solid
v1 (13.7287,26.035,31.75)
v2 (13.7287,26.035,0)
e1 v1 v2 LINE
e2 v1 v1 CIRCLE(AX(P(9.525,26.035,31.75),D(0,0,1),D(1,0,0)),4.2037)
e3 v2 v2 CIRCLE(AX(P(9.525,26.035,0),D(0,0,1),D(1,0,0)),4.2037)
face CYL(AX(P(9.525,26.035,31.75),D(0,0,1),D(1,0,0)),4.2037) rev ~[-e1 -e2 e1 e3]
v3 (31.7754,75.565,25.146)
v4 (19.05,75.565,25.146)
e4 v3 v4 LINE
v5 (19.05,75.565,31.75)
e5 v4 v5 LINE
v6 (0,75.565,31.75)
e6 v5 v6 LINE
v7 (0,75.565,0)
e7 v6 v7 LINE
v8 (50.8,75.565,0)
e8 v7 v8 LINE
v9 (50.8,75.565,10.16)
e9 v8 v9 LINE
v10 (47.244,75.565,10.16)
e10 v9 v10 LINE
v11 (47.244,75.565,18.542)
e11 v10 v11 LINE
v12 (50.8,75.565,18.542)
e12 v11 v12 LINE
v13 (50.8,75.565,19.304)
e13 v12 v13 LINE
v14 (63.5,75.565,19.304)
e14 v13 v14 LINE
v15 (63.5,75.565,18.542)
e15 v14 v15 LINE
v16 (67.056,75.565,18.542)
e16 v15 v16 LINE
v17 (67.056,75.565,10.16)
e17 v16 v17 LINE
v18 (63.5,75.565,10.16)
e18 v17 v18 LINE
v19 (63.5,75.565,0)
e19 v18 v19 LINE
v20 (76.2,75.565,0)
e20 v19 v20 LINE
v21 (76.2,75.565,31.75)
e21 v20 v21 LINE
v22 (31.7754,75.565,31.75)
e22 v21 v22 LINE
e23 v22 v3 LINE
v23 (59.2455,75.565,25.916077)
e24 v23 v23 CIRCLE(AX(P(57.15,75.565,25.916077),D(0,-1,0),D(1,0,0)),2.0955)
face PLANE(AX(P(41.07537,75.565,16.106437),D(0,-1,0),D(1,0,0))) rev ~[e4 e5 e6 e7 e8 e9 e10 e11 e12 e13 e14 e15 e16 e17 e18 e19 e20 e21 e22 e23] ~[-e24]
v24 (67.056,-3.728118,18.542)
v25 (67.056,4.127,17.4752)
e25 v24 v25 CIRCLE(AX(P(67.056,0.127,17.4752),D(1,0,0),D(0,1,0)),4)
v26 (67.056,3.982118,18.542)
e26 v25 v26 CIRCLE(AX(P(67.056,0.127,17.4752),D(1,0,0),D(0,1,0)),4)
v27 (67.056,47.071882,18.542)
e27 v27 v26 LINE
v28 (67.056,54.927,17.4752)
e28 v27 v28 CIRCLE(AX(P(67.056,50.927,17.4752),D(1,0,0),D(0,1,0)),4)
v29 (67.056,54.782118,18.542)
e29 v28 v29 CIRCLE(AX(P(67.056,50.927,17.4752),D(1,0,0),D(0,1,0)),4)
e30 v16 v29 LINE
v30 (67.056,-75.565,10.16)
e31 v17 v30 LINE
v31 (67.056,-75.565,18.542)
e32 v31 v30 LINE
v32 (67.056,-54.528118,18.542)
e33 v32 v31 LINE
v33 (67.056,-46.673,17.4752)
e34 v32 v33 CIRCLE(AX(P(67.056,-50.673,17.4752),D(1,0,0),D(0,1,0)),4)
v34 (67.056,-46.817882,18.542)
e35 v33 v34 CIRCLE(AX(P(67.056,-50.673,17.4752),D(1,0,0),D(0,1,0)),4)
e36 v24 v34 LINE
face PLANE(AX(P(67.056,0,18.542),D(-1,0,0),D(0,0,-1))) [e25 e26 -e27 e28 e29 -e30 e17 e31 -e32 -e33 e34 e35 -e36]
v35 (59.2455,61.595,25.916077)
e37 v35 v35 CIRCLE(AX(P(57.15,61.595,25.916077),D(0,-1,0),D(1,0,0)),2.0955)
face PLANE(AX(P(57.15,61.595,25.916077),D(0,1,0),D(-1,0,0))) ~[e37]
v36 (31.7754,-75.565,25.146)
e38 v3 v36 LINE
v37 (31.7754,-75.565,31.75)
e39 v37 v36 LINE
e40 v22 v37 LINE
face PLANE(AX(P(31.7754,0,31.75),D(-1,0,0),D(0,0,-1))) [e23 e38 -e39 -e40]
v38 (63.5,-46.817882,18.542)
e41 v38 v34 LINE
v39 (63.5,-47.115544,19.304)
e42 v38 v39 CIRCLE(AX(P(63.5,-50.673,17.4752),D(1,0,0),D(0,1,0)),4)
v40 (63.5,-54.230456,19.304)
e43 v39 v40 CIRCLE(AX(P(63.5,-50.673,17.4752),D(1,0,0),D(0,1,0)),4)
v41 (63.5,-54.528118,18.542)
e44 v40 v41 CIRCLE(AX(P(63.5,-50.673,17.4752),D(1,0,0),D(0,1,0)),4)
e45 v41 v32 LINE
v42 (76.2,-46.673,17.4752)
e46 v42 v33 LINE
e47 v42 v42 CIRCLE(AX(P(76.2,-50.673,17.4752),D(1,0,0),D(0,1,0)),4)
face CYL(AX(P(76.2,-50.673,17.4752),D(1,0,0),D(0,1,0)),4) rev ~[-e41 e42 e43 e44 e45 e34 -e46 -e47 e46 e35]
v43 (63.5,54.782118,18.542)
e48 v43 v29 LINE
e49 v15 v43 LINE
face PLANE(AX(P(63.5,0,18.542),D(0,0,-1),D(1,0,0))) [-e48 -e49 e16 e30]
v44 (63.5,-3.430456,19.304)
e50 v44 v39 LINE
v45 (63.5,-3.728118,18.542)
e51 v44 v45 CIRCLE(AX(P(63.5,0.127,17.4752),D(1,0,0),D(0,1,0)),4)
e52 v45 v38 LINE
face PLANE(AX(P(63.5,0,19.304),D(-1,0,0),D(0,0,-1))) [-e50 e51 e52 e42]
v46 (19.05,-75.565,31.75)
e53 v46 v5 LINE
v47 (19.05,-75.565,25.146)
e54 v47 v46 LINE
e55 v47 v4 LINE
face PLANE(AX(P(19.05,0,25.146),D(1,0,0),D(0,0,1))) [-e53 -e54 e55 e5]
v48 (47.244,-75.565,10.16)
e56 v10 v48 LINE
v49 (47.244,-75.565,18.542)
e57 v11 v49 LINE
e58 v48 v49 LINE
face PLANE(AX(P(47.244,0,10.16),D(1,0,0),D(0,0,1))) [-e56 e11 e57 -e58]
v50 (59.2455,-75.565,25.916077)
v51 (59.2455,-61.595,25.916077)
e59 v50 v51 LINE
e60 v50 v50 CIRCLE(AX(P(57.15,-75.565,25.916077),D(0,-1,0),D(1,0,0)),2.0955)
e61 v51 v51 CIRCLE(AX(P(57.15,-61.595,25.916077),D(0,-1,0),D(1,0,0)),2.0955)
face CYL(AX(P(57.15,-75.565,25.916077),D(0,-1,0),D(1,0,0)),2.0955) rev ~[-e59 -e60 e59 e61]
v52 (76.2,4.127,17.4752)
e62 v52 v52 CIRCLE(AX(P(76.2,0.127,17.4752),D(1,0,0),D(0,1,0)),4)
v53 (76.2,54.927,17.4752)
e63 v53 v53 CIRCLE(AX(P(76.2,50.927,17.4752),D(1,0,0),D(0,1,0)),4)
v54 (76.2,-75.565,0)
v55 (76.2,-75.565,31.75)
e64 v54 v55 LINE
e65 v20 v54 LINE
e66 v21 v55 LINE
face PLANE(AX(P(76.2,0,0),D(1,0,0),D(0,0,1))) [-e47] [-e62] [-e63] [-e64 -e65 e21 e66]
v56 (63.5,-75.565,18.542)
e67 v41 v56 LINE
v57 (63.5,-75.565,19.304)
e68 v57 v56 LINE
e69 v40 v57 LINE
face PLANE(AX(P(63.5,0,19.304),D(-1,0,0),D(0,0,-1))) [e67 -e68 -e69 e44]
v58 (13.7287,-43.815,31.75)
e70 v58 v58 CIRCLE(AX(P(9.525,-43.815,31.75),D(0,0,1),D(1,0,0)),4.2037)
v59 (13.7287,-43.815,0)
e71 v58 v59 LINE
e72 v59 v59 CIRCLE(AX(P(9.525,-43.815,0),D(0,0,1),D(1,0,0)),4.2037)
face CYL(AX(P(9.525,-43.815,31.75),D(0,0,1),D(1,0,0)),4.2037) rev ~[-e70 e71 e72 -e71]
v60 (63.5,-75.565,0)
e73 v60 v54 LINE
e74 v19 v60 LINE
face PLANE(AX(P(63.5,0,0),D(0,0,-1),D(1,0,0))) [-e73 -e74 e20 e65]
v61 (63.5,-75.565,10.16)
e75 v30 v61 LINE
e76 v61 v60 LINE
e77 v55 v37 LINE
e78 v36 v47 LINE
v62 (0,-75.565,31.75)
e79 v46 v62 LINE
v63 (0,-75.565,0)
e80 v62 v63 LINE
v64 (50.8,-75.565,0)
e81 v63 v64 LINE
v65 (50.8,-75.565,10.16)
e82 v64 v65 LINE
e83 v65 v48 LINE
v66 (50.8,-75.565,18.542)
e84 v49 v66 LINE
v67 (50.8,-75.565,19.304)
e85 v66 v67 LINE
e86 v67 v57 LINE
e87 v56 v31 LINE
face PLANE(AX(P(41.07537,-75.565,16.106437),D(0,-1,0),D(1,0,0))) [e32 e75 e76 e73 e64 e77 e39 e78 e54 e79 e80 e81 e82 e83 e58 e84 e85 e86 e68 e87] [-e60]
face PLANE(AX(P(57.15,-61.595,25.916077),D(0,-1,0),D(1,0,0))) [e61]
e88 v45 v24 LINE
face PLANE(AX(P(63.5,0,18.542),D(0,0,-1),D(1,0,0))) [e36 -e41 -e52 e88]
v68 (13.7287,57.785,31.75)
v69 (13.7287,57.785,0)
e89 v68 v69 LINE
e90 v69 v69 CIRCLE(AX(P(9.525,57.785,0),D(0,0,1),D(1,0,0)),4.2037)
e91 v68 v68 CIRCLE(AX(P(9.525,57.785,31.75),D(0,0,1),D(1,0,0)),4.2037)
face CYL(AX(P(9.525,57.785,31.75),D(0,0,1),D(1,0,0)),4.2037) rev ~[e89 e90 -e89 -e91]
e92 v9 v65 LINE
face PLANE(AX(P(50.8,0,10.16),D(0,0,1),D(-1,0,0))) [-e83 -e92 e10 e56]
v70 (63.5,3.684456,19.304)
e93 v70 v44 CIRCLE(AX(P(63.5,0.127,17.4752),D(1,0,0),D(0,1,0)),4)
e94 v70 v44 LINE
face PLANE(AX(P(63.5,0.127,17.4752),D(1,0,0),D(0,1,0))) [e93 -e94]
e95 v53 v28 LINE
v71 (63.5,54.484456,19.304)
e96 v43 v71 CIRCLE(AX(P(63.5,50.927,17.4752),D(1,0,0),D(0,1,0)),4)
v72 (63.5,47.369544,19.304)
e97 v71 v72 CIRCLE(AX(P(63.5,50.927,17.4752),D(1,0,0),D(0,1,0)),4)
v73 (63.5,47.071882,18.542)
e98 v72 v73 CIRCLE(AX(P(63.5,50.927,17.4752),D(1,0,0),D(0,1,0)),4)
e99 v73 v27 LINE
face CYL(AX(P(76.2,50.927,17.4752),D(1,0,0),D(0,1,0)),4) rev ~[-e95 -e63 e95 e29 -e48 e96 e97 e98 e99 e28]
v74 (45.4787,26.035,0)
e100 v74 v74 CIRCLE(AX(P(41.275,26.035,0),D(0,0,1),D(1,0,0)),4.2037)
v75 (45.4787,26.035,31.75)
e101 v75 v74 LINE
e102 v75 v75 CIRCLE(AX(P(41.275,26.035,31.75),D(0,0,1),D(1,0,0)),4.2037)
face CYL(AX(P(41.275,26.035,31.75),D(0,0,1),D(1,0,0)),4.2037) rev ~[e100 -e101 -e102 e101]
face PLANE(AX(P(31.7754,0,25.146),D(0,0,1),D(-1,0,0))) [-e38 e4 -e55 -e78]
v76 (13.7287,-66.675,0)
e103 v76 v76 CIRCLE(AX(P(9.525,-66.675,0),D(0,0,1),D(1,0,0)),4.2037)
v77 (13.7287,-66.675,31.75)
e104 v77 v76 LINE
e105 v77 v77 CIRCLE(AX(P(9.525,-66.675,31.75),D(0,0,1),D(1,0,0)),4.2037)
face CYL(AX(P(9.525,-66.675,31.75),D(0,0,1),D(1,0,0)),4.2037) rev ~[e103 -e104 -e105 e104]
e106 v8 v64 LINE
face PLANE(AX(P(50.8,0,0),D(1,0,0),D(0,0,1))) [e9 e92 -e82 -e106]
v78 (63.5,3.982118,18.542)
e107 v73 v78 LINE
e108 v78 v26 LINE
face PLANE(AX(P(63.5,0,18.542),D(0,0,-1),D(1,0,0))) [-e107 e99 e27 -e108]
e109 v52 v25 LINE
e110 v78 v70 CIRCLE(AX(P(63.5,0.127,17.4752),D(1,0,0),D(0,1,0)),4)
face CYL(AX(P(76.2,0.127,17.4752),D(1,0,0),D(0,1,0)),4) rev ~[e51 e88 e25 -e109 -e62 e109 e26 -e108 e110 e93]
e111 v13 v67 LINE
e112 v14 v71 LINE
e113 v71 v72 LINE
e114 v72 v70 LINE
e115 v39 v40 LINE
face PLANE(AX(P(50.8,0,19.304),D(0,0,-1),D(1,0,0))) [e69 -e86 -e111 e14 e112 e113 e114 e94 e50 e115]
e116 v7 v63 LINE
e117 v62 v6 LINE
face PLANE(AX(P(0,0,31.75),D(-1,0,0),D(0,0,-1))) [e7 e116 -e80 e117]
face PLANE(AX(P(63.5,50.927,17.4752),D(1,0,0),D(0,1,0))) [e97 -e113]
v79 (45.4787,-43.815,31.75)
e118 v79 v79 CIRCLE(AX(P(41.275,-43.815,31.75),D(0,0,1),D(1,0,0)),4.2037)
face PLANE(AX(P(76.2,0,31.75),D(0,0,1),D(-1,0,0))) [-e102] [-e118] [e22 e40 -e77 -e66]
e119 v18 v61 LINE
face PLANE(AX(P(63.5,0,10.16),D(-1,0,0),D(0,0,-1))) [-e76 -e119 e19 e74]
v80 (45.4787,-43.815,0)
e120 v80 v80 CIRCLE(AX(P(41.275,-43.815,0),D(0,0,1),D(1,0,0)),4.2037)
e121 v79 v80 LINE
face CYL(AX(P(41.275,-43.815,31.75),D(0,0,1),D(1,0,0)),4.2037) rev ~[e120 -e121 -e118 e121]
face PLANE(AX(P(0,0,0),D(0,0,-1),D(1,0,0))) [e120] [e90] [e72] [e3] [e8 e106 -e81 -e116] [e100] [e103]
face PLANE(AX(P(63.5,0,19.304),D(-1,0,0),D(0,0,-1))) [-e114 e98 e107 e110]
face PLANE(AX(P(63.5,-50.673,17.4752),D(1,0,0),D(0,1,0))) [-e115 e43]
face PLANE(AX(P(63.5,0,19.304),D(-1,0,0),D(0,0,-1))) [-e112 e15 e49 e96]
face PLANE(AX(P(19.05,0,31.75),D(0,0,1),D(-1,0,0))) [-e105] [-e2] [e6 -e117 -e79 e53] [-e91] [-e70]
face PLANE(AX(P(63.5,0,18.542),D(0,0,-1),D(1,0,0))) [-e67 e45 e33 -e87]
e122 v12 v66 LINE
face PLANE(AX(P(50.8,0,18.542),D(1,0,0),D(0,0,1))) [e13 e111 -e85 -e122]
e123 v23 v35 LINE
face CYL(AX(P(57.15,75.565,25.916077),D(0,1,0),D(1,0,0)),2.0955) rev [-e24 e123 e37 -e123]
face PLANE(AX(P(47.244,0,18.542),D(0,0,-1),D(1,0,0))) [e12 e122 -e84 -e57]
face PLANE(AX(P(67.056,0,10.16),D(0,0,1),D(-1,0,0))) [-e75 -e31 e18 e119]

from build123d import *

# Parameters (mm, degrees)
F1_DEPTH = 75.565
F2_R     = 2.0955
F3_DEPTH = 13.97
F4_R     = 4
F5_DEPTH = 12.7
F6_R     = 4.2037
F7_DEPTH = 31.751


# Not quite as in the source:
# - a pattern or mirror of a feature is missing from the dataset's text; its kind, count and spacing are read off the source's solid


with BuildPart() as f1:
    # F0 (on Front) → F1 (new body, symmetric)
    with BuildSketch(Plane.XZ):
        Polygon((0, 31.75), (0, 0), (50.8, 0), (50.8, 10.16), (47.244, 10.16), (47.244, 18.542), (50.8, 18.542), (50.8, 19.304), (63.5, 19.304), (63.5, 18.542), (67.056, 18.542), (67.056, 10.16), (63.5, 10.16), (63.5, 0), (76.2, 0), (76.2, 31.75), (31.7754, 31.75), (31.7754, 25.146), (19.05, 25.146), (19.05, 31.75), align=None)
    extrude(amount=F1_DEPTH, both=True)

    # F2 (on face) → F3 (cut)
    with BuildSketch(Plane.XZ.offset(75.565)):
        with Locations((57.15, 25.9160771966)):
            Circle(F2_R)
    f3 = extrude(amount=-F3_DEPTH, mode=Mode.SUBTRACT)

    # F3_copies: F3 across plane
    add(f3.mirror(Plane.ZX), mode=Mode.SUBTRACT)

    # F4 (on face) → F5 (cut)
    with BuildSketch(Plane.YZ.offset(76.2)):
        with Locations((-50.673, 17.4752)):
            Circle(F4_R)
        with Locations((0.127, 17.4752)):
            Circle(F4_R)
        with Locations((50.927, 17.4752)):
            Circle(F4_R)
    extrude(amount=-F5_DEPTH, mode=Mode.SUBTRACT)

    # F6 (on face) → F7 (cut, through all)
    with BuildSketch(Plane.XY.offset(31.75)):
        with Locations((9.525, 57.785)):
            Circle(F6_R)
        with Locations((9.525, 26.035)):
            Circle(F6_R)
        with Locations((41.275, 26.035)):
            Circle(F6_R)
        with Locations((41.275, -43.815)):
            Circle(F6_R)
        with Locations((9.525, -43.815)):
            Circle(F6_R)
        with Locations((9.525, -66.675)):
            Circle(F6_R)
    extrude(amount=-F7_DEPTH, mode=Mode.SUBTRACT)


solid = f1.part
